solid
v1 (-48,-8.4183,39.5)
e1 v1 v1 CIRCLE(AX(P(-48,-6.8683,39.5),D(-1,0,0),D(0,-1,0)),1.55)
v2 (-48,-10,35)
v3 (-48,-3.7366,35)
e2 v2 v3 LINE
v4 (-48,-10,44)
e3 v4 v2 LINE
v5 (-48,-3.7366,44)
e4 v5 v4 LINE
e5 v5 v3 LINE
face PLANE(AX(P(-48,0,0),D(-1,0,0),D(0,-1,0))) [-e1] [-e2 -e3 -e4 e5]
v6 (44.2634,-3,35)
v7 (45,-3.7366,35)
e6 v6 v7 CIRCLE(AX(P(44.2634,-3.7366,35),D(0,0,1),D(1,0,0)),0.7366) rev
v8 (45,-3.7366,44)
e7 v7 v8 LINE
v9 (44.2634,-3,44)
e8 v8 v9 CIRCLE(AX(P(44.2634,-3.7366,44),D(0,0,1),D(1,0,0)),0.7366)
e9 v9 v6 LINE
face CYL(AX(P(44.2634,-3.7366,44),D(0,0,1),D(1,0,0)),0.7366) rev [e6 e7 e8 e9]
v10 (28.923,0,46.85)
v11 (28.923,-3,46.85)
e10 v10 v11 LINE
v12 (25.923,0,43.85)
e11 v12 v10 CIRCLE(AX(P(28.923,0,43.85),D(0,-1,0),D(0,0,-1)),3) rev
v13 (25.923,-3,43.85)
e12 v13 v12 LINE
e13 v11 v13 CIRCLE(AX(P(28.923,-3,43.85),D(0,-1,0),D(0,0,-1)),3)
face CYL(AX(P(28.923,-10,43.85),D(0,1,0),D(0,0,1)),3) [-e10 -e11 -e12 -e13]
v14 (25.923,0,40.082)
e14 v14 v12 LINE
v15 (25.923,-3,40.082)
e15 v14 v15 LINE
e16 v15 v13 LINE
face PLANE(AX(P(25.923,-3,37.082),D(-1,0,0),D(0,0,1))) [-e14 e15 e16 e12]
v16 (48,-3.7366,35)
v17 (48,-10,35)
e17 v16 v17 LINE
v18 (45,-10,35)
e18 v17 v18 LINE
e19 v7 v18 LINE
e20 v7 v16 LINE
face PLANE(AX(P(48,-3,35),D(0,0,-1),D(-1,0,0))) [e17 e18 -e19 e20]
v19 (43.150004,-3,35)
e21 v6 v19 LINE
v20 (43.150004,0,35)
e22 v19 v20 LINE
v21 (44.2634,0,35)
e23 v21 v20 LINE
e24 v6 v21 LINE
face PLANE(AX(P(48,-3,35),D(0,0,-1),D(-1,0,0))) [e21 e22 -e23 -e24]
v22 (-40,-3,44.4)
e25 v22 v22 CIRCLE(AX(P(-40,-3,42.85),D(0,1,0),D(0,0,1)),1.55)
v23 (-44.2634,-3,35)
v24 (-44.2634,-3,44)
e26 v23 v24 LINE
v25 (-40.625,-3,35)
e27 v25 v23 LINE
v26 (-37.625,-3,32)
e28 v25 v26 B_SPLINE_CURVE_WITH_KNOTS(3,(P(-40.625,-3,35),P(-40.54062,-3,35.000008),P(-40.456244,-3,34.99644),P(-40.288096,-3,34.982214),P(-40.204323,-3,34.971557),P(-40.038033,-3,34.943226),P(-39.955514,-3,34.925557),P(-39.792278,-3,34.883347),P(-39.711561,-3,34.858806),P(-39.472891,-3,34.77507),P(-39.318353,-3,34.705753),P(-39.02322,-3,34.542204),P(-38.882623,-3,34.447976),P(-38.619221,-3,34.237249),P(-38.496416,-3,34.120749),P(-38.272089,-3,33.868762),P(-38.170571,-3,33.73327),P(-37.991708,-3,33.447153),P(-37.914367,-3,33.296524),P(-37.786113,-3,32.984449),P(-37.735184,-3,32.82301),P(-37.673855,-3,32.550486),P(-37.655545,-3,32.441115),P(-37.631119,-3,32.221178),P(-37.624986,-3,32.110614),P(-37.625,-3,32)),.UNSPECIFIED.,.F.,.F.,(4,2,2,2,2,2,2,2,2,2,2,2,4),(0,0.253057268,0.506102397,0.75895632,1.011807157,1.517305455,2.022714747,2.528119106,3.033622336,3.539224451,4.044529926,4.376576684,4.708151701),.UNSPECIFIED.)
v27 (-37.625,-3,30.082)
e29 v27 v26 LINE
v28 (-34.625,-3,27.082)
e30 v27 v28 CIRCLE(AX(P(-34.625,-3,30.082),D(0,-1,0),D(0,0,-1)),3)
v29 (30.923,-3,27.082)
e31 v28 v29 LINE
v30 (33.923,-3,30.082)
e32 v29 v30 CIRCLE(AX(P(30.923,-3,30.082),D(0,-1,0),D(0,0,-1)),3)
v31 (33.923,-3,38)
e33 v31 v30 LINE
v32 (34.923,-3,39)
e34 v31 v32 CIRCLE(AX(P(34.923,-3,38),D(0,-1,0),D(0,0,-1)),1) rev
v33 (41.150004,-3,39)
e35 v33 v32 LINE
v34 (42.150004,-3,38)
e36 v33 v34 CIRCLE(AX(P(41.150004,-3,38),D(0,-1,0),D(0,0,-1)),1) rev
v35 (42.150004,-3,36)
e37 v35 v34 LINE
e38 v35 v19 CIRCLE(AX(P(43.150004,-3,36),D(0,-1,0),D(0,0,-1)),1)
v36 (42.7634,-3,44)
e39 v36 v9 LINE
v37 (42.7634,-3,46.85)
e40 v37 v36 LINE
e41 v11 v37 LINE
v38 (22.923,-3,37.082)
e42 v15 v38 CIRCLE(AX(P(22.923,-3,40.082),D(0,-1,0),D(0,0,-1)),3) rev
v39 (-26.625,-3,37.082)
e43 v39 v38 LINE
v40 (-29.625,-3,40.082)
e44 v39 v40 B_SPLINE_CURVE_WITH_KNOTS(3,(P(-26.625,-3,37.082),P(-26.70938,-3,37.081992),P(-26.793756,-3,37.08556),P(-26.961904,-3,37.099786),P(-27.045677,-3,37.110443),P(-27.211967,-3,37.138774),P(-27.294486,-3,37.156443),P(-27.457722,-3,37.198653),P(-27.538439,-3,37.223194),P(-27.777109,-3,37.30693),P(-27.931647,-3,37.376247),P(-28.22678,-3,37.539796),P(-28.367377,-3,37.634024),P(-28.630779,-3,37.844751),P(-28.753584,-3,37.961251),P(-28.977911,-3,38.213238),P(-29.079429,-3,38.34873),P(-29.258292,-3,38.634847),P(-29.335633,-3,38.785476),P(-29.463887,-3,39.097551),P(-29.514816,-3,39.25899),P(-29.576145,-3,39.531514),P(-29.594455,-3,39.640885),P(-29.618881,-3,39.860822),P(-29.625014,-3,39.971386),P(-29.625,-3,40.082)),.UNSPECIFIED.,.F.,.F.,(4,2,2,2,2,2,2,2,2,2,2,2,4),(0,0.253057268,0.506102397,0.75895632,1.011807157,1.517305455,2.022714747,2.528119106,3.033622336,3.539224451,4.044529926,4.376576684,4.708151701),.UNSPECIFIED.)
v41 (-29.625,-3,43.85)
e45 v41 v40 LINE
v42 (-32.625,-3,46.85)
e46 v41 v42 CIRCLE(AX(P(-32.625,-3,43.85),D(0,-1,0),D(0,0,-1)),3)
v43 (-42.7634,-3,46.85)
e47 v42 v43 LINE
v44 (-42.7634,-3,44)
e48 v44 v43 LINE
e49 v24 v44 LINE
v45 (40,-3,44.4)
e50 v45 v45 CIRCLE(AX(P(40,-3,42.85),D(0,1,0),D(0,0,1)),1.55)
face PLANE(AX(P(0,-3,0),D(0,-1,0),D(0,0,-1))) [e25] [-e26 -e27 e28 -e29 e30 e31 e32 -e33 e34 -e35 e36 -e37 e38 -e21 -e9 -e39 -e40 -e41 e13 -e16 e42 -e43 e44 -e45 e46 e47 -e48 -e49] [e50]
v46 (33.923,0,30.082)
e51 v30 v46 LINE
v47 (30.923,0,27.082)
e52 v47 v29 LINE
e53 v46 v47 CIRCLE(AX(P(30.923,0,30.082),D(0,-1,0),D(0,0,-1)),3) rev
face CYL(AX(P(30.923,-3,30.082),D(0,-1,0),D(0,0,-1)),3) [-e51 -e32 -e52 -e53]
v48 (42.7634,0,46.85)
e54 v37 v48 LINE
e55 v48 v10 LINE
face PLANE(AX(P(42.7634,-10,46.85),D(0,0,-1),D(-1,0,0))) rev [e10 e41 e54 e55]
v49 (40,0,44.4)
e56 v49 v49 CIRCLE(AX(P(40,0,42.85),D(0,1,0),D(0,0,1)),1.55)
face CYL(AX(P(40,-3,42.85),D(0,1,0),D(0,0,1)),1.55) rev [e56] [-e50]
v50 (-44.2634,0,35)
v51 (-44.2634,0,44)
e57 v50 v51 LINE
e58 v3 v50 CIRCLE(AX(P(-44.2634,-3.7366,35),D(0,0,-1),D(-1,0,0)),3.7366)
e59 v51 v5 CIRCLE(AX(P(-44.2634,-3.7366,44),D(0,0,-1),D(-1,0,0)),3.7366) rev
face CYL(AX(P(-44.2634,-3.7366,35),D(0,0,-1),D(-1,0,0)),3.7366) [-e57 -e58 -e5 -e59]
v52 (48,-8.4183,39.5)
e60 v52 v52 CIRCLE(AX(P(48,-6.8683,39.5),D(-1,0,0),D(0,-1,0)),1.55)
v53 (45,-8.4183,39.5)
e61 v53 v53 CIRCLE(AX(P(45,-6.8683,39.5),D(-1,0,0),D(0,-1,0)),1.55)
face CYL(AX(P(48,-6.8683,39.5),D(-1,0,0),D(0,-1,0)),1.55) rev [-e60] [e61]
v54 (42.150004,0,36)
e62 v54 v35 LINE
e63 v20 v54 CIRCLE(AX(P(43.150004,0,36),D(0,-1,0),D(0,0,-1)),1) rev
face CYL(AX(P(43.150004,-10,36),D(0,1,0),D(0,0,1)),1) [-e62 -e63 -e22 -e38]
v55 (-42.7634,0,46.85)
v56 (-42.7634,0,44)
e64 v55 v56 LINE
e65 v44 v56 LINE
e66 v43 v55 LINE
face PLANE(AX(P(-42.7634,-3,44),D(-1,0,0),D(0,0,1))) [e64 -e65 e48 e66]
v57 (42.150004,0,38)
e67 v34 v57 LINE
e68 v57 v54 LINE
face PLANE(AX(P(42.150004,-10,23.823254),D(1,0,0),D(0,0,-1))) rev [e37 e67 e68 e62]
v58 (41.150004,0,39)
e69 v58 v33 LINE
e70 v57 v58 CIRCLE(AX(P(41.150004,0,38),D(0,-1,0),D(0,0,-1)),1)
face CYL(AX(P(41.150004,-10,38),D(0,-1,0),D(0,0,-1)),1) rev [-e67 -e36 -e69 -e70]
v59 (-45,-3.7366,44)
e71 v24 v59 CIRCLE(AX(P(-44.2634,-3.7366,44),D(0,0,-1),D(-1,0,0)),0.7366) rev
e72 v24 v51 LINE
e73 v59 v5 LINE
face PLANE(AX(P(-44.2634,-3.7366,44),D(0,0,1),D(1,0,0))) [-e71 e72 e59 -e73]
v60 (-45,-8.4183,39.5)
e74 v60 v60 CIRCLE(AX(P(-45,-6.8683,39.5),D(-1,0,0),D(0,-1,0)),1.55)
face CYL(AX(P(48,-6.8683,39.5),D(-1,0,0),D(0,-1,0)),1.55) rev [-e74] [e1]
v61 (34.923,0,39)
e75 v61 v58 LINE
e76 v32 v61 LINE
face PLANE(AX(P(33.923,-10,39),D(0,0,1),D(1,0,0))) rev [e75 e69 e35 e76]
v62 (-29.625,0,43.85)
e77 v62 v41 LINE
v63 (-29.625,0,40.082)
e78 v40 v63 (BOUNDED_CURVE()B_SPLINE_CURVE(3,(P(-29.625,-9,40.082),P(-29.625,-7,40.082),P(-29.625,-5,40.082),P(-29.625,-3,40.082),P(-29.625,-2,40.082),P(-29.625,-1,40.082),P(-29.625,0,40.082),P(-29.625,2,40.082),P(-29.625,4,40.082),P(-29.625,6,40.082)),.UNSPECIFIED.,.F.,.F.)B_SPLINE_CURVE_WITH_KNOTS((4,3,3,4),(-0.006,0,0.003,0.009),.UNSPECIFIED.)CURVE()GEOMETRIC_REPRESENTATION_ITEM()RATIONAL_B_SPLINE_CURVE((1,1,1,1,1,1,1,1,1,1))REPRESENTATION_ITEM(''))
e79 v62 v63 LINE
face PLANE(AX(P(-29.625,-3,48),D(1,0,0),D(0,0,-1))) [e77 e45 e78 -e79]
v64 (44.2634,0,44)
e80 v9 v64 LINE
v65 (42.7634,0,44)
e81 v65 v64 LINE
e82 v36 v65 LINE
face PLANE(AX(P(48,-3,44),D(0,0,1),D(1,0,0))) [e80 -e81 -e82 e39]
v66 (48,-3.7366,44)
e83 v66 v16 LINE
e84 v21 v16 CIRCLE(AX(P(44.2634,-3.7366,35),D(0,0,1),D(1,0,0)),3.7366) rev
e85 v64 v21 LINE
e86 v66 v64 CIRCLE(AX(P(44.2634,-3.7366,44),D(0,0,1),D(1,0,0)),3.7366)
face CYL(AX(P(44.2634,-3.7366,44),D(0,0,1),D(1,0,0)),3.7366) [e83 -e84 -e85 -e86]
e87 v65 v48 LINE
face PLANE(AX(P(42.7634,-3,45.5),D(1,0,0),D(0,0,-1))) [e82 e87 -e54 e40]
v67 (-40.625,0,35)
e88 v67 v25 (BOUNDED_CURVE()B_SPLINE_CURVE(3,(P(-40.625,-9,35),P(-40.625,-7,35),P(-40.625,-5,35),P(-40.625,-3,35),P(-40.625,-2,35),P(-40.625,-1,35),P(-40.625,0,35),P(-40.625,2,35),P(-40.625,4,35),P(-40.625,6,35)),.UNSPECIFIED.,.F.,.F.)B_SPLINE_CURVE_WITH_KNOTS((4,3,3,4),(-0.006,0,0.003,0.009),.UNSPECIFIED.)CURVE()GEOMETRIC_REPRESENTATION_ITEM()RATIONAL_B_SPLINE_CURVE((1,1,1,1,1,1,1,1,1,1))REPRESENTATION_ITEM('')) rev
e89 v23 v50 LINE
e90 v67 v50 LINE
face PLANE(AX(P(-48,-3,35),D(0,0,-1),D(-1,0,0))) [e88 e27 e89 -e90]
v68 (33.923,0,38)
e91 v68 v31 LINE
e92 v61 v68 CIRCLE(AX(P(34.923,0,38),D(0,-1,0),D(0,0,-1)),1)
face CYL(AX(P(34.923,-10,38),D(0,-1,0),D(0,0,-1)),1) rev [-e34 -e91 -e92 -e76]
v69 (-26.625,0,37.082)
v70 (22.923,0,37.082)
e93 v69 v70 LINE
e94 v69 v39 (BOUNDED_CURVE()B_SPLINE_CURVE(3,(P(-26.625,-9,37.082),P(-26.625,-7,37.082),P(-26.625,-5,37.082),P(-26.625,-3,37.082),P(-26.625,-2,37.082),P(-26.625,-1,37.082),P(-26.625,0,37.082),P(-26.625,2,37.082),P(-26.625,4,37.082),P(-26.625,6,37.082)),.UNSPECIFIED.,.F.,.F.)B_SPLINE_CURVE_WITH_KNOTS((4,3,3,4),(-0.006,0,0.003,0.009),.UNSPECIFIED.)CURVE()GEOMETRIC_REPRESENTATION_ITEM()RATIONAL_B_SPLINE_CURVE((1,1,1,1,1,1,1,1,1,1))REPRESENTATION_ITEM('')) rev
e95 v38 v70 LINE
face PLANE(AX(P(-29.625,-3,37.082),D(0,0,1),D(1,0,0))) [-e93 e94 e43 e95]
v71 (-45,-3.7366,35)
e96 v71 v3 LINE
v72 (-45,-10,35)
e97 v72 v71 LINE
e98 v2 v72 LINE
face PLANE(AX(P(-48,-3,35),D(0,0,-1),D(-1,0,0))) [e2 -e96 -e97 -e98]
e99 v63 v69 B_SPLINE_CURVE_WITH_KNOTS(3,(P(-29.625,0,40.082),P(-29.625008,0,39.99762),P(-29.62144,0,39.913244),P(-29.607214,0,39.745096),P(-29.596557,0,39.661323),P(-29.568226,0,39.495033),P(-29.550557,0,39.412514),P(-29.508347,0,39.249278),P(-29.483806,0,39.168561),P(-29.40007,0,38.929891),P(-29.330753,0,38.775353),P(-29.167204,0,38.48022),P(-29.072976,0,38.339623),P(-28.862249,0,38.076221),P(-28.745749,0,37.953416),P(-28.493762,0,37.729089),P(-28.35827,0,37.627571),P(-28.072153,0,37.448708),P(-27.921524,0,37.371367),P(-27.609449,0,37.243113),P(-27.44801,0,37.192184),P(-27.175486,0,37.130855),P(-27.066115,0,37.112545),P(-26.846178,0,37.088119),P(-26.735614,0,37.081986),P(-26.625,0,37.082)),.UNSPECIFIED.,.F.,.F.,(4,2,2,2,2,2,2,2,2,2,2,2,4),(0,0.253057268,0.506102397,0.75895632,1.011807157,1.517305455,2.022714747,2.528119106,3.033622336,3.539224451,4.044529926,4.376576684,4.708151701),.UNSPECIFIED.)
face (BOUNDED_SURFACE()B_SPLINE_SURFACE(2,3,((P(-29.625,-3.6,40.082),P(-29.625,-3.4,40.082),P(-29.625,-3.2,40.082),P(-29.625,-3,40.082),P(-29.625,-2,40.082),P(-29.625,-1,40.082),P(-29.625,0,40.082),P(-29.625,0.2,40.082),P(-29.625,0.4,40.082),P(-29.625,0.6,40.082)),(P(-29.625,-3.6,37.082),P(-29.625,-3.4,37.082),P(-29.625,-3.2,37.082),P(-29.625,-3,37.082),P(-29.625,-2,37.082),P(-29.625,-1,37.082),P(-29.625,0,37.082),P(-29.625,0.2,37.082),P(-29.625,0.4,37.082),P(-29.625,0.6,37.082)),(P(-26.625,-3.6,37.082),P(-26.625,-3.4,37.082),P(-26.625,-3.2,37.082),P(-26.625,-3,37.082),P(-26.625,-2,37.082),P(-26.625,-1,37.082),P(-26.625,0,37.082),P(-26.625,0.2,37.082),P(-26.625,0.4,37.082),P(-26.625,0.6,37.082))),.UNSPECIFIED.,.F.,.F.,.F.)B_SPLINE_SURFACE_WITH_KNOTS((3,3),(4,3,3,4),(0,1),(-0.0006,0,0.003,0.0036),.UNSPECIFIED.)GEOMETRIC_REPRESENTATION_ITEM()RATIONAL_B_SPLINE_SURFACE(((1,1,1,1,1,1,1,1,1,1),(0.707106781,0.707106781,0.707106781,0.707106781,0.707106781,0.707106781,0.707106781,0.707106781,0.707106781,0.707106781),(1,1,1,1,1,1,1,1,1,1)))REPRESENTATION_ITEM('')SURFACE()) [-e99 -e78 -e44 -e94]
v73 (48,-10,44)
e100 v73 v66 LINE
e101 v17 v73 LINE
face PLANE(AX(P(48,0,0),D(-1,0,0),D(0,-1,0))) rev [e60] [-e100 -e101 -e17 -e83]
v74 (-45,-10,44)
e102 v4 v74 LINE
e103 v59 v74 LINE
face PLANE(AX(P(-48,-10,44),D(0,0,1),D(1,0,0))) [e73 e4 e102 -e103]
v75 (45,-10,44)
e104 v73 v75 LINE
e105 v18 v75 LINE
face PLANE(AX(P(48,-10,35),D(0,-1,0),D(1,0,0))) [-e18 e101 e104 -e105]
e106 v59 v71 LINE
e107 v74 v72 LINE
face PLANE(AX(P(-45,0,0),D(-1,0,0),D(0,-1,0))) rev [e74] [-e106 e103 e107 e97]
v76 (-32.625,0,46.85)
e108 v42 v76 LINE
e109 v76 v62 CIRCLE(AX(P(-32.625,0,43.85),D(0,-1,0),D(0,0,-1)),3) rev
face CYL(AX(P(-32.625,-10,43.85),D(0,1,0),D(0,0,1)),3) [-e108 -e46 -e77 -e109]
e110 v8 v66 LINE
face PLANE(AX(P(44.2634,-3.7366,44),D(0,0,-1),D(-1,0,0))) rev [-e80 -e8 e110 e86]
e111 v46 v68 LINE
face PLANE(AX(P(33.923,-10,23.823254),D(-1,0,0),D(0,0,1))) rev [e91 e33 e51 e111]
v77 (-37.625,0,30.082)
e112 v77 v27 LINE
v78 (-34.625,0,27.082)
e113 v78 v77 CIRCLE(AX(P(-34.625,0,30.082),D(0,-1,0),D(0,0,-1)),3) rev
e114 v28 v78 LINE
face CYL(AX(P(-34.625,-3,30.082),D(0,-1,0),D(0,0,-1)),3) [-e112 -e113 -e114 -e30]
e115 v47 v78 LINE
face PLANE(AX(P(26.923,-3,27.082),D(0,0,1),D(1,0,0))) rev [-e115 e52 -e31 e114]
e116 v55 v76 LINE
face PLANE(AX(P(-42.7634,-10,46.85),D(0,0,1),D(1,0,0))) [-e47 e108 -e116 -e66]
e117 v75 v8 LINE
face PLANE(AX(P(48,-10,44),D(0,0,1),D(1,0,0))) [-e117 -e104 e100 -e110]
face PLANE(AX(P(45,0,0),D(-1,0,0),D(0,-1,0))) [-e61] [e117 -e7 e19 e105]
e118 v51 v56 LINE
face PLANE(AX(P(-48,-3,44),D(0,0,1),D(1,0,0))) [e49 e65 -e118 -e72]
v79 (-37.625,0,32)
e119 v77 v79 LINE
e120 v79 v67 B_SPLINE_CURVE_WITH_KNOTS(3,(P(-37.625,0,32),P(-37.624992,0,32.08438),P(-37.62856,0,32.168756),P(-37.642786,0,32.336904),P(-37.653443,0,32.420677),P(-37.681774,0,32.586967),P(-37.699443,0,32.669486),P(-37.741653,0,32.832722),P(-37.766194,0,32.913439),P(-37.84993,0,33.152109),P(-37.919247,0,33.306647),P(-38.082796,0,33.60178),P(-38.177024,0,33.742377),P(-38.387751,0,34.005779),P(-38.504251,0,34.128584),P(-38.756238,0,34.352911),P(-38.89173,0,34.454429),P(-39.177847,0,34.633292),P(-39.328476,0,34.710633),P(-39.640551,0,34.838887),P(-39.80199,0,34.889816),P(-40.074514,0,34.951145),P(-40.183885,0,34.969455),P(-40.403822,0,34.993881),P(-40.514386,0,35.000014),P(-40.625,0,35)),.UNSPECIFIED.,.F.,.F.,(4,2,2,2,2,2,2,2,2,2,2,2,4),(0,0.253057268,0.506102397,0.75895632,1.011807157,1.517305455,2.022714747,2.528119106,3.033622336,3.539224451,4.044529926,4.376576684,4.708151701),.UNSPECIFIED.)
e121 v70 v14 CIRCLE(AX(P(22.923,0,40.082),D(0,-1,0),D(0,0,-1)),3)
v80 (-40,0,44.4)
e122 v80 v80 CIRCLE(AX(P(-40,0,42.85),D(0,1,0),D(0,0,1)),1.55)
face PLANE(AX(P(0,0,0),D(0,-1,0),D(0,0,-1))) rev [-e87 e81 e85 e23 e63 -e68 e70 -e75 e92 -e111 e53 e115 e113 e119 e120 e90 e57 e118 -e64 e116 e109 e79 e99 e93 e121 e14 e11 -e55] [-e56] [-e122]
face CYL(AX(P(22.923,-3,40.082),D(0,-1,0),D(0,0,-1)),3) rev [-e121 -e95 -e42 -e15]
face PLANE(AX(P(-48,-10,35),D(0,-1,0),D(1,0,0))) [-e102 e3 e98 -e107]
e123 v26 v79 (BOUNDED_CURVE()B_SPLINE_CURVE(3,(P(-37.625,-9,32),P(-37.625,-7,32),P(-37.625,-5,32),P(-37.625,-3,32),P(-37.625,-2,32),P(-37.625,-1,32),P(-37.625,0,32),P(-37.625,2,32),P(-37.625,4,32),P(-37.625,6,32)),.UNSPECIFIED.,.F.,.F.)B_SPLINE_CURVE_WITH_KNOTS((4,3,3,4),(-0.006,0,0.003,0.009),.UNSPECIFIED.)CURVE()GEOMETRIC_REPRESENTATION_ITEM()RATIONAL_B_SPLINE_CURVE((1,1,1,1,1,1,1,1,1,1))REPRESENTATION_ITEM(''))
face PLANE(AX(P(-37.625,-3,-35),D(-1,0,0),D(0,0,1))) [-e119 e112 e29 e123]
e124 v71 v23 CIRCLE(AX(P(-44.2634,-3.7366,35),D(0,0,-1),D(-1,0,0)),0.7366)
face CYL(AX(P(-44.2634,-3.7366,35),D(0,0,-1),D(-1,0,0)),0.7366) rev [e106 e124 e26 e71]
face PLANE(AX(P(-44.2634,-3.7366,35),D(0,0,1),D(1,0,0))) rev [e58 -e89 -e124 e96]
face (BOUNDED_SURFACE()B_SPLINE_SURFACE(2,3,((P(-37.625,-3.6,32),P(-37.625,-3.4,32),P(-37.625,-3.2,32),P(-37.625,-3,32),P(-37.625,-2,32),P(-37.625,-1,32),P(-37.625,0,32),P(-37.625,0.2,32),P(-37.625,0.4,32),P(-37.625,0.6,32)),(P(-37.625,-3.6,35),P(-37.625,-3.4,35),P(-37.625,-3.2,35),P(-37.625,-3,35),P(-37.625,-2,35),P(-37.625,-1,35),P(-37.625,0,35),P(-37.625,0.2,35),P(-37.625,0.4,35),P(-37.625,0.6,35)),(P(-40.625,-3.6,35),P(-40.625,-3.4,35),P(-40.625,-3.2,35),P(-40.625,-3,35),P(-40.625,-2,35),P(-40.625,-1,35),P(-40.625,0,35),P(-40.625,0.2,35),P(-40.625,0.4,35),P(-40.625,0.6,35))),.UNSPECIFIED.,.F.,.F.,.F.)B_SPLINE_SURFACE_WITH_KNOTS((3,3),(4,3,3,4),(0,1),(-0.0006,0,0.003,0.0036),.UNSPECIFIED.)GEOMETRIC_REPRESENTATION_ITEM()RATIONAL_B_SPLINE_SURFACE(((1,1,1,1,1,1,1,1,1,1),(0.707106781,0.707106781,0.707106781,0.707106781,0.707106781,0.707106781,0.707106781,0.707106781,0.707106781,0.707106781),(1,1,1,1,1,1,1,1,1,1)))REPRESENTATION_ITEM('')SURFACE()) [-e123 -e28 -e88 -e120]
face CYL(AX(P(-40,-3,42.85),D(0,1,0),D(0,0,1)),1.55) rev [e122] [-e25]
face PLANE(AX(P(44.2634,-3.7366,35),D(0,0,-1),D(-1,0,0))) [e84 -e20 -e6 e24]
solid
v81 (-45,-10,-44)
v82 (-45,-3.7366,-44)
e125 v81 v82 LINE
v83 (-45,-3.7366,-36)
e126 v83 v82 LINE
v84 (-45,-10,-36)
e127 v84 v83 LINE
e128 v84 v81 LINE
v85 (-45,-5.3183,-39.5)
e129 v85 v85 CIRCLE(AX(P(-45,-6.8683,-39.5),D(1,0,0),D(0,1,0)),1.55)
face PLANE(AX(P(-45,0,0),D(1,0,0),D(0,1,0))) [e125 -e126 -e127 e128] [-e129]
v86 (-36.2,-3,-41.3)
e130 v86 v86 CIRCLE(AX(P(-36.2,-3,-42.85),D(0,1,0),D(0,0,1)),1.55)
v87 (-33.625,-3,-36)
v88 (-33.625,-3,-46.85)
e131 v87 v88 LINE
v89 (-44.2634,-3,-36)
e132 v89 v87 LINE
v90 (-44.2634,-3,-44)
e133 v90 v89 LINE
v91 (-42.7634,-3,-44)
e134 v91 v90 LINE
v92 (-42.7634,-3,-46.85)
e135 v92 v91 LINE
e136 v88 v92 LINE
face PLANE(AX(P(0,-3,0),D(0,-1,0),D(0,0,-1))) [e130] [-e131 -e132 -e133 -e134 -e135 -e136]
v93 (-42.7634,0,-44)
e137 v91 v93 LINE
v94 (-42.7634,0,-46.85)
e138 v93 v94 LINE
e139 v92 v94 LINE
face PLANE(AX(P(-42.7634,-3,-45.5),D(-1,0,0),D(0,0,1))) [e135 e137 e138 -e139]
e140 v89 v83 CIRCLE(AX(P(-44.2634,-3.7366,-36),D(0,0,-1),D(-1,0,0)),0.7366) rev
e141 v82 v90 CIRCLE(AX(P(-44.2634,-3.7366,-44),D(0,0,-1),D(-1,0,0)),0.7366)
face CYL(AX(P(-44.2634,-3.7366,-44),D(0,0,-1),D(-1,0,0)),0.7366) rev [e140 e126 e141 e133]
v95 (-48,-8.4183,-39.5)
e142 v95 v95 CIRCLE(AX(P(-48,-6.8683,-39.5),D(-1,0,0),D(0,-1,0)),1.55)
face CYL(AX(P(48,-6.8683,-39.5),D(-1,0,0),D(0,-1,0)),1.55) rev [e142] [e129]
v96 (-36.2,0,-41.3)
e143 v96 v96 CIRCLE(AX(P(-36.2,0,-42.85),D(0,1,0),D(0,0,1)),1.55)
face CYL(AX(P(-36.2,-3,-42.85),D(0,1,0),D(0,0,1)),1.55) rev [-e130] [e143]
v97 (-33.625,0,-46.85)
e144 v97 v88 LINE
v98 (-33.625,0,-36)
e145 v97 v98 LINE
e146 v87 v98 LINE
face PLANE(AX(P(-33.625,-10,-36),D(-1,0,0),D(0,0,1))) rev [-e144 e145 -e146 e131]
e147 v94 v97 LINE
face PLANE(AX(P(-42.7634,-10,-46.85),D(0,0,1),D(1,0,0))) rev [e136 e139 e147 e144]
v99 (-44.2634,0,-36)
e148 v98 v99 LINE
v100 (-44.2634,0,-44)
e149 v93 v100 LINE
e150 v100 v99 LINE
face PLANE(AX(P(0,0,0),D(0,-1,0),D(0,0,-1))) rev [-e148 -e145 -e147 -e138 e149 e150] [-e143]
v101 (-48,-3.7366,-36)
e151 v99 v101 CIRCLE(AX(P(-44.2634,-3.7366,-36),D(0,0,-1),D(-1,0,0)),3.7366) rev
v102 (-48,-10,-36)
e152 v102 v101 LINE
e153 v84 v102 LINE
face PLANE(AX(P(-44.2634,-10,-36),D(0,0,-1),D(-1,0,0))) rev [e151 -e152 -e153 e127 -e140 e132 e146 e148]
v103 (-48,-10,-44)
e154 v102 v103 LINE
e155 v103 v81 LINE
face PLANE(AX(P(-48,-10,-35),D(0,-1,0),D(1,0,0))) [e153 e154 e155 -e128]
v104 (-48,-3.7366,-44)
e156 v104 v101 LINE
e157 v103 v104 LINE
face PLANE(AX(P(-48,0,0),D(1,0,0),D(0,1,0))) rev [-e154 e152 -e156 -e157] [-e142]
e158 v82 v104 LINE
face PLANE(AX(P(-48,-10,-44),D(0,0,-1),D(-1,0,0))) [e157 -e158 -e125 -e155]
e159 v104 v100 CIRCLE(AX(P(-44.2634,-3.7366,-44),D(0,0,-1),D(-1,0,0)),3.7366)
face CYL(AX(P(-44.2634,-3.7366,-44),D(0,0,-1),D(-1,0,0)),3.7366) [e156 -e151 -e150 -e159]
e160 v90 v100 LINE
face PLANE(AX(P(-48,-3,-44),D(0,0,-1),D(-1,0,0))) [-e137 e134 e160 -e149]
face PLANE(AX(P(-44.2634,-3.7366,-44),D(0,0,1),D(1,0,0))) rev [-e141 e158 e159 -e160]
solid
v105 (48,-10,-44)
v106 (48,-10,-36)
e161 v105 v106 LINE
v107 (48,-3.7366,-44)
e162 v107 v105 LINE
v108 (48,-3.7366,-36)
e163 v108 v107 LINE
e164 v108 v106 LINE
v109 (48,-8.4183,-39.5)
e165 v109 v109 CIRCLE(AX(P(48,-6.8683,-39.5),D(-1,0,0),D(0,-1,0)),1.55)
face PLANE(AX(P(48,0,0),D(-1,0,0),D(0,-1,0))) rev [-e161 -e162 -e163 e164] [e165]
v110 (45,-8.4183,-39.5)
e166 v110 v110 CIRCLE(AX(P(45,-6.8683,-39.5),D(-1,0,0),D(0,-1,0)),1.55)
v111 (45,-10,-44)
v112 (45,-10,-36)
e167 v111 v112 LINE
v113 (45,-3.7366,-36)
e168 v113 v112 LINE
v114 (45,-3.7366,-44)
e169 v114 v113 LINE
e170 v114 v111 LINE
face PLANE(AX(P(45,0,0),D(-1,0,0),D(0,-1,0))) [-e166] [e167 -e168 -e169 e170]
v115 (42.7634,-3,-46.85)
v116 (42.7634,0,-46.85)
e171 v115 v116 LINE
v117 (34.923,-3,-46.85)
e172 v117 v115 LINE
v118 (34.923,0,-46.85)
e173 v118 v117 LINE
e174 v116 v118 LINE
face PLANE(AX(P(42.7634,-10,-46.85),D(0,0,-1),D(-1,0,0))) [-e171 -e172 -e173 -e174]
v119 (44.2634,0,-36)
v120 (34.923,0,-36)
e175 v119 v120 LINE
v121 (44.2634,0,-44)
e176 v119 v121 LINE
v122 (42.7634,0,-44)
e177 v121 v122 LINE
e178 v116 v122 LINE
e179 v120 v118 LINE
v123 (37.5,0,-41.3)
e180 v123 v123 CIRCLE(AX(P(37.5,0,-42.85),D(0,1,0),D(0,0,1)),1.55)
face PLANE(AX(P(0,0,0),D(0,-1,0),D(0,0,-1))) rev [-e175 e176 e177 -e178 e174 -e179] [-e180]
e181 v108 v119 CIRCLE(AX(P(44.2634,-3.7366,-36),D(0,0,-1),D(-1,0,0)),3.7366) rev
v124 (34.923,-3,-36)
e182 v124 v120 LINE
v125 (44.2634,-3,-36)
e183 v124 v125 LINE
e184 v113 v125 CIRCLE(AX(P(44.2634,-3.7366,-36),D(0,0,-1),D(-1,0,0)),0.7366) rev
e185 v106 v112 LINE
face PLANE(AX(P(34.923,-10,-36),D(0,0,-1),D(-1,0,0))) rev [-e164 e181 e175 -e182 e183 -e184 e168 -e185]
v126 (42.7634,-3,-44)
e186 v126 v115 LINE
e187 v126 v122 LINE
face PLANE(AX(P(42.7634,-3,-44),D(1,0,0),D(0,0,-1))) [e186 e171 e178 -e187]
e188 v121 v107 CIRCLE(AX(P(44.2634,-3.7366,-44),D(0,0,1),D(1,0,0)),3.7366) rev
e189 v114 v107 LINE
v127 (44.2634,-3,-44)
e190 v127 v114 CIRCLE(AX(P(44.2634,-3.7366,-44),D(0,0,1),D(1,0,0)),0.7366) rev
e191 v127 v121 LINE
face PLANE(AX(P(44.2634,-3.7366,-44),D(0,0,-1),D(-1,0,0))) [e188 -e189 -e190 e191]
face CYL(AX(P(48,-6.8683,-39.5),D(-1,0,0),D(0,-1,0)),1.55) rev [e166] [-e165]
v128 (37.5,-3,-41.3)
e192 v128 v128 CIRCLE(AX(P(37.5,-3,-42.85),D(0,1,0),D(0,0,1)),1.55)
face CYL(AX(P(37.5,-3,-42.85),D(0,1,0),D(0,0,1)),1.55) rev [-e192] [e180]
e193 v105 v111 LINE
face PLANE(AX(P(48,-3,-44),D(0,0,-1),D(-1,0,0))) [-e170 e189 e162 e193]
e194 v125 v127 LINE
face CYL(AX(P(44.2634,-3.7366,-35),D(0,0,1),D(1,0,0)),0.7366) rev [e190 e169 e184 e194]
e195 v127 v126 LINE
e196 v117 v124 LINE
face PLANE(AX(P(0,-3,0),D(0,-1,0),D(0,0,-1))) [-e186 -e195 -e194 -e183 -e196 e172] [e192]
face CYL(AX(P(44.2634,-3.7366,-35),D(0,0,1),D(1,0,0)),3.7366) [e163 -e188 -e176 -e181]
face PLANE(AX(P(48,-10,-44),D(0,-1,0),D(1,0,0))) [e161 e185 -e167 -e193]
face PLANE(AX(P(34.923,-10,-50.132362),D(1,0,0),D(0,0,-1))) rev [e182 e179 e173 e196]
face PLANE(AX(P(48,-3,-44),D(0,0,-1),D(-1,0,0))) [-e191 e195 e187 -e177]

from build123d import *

# Parameters (mm, degrees)
SKETCH2_R                = 1.55
SKETCH2_W                = 53.846
SKETCH2_H                = 54.164
BASE_FLANGE1_DEPTH       = 3
VARFILLET1_START         = -3
VARFILLET1_DEPTH         = 3
VARFILLET2_START         = -3
VARFILLET2_DEPTH         = 3
EDGE_FLANGE1_START       = -44
EDGE_FLANGE1_DEPTH       = 88
EDGE_FLANGE1_START_2     = -45.5
EDGE_FLANGE1_2_OUTLINE_W = 1.2366
EDGE_FLANGE1_2_OUTLINE_H = 3
EDGE_FLANGE1_2_DEPTH     = 1.5
EDGE_FLANGE1_START_3     = 44
EDGE_FLANGE1_3_OUTLINE_W = 1.2366
EDGE_FLANGE1_3_OUTLINE_H = 3
EDGE_FLANGE1_3_DEPTH     = 1.5
EDGE_FLANGE1_4_DEPTH     = 9
EDGE_FLANGE1_START_4     = 35
EDGE_FLANGE1_5_DEPTH     = 9
CUT_EXTRUDE1_DEPTH       = 69.614867264
SKETCH20_R               = 1.55
CUT_EXTRUDE2_DEPTH       = 108.288967324
CUT_EXTRUDE3_DEPTH       = 68.815356
CUT_EXTRUDE3_DEPTH_BACK  = 68.815356
FILLET1_R                = 3
CUT_EXTRUDE4_DEPTH       = 68.815356
SKETCH29_W               = 8.227003602
SKETCH29_H               = 15.176745615
CUT_EXTRUDE5_DEPTH       = 68.815356
FILLET2_R                = 1
FILLET3_R                = 3


with BuildPart() as part:
    # Base-Flange1: sheet metal written as solids
    # Sketch2 → Base-Flange1 (new body)
    with BuildSketch(Plane(origin=(0, 0, 0), x_dir=(1, 0, 0), z_dir=(0, 1, 0))):
        Polygon((-29.625, 48), (-29.625, 37.082), (30.923, 37.082), (30.923, 48), (44, 48), (44, 44), (48, 44), (48, 35), (36.923, 35), (36.923, -35), (48, -35), (48, -44), (44, -44), (44, -48), (30.923, -48), (25.923, -48), (25.923, -37.082), (-29.625, -37.082), (-29.625, -48), (-44, -48), (-44, -44), (-48, -44), (-48, -35), (-37.625, -35), (-37.625, 35), (-48, 35), (-48, 44), (-44, 44), (-44, 48), align=None)
        with Locations(Location((-36.2, 42.85, 0), (0, 0, 270))):
            Circle(SKETCH2_R, mode=Mode.SUBTRACT)
        with Locations(Location((-40, -42.85, 0), (0, 0, 270))):
            Circle(SKETCH2_R, mode=Mode.SUBTRACT)
        with Locations(Location((40, -42.85, 0), (0, 0, 270))):
            Circle(SKETCH2_R, mode=Mode.SUBTRACT)
        with Locations(Location((37.5, 42.85, 0), (0, 0, 270))):
            Circle(SKETCH2_R, mode=Mode.SUBTRACT)
        Rectangle(SKETCH2_W, SKETCH2_H, mode=Mode.SUBTRACT)
    extrude(amount=-BASE_FLANGE1_DEPTH)

    # VarFillet1: read off the stored shape, not the designer's step
    # VarFillet1 outline → VarFillet1 (add)
    with BuildSketch(Plane(origin=(0, 0, 0), x_dir=(1, 0, 0), z_dir=(0, 1, 0)).offset(VARFILLET1_START)):
        with BuildLine():
            Line((30.923, 37.082), (30.923, 40.082))
            add(Edge.make_bspline(
                [(30.923, 40.082), (30.923, 37.082), (27.923, 37.082)],
                knots=[0, 0, 0, 1, 1, 1], degree=2, weights=[1, 0.707106781, 1]))
            Line((27.923, 37.082), (30.923, 37.082))
        make_face()
        with BuildLine():
            Line((36.923, 35), (36.923, 32))
            add(Edge.make_bspline(
                [(36.923, 32), (36.923, 35), (39.923, 35)],
                knots=[0, 0, 0, 1, 1, 1], degree=2, weights=[1, 0.707106781, 1]))
            Line((39.923, 35), (36.923, 35))
        make_face()
        with BuildLine():
            add(Edge.make_bspline(
                [(39.923, -35), (36.923, -35), (36.923, -32)],
                knots=[0, 0, 0, 1, 1, 1], degree=2, weights=[1, 0.707106781, 1]))
            Line((36.923, -32), (36.923, -35))
            Line((36.923, -35), (39.923, -35))
        make_face()
        with BuildLine():
            Line((-29.625, -37.082), (-29.625, -40.082))
            add(Edge.make_bspline(
                [(-29.625, -40.082), (-29.625, -37.082), (-26.625, -37.082)],
                knots=[0, 0, 0, 1, 1, 1], degree=2, weights=[1, 0.707106781, 1]))
            Line((-26.625, -37.082), (-29.625, -37.082))
        make_face()
    extrude(amount=VARFILLET1_DEPTH)

    # VarFillet2: read off the stored shape, not the designer's step
    # VarFillet2 outline → VarFillet2 (add)
    with BuildSketch(Plane(origin=(0, 0, 0), x_dir=(1, 0, 0), z_dir=(0, 1, 0)).offset(VARFILLET2_START)):
        with BuildLine():
            Line((26.923, -27.082), (26.923, -24.082))
            add(Edge.make_bspline(
                [(26.923, -24.082), (26.923, -27.082), (23.923, -27.082)],
                knots=[0, 0, 0, 1, 1, 1], degree=2, weights=[1, 0.707106781, 1]))
            Line((23.923, -27.082), (26.923, -27.082))
        make_face()
        with BuildLine():
            add(Edge.make_bspline(
                [(23.923, 27.082), (26.923, 27.082), (26.923, 24.082)],
                knots=[0, 0, 0, 1, 1, 1], degree=2, weights=[1, 0.707106781, 1]))
            Line((26.923, 24.082), (26.923, 27.082))
            Line((26.923, 27.082), (23.923, 27.082))
        make_face()
        with BuildLine():
            Line((-26.923, -27.082), (-23.923, -27.082))
            add(Edge.make_bspline(
                [(-23.923, -27.082), (-26.923, -27.082), (-26.923, -24.082)],
                knots=[0, 0, 0, 1, 1, 1], degree=2, weights=[1, 0.707106781, 1]))
            Line((-26.923, -24.082), (-26.923, -27.082))
        make_face()
        with BuildLine():
            add(Edge.make_bspline(
                [(-26.923, 24.082), (-26.923, 27.082), (-23.923, 27.082)],
                knots=[0, 0, 0, 1, 1, 1], degree=2, weights=[1, 0.707106781, 1]))
            Line((-23.923, 27.082), (-26.923, 27.082))
            Line((-26.923, 27.082), (-26.923, 24.082))
        make_face()
        with BuildLine():
            Line((-37.625, -35), (-37.625, -32))
            add(Edge.make_bspline(
                [(-37.625, -32), (-37.625, -35), (-40.625, -35)],
                knots=[0, 0, 0, 1, 1, 1], degree=2, weights=[1, 0.707106781, 1]))
            Line((-40.625, -35), (-37.625, -35))
        make_face()
        with BuildLine():
            add(Edge.make_bspline(
                [(-40.625, 35), (-37.625, 35), (-37.625, 32)],
                knots=[0, 0, 0, 1, 1, 1], degree=2, weights=[1, 0.707106781, 1]))
            Line((-37.625, 32), (-37.625, 35))
            Line((-37.625, 35), (-40.625, 35))
        make_face()
        with BuildLine():
            Line((-29.625, 37.082), (-26.625, 37.082))
            add(Edge.make_bspline(
                [(-26.625, 37.082), (-29.625, 37.082), (-29.625, 40.082)],
                knots=[0, 0, 0, 1, 1, 1], degree=2, weights=[1, 0.707106781, 1]))
            Line((-29.625, 40.082), (-29.625, 37.082))
        make_face()
    extrude(amount=VARFILLET2_DEPTH)

    # Edge-Flange1: read off the stored shape, not the designer's step
    # Edge-Flange1 outline → Edge-Flange1 (cut)
    with BuildSketch(Plane.XY.offset(EDGE_FLANGE1_START)):
        with BuildLine():
            ThreePointArc((-47.926677222, -3), (-46.630867001, -0.845704021), (-44.2634, 0))
            Line((-44.2634, 0), (-48, 0))
            Line((-48, 0), (-48, -3))
            Line((-48, -3), (-47.926677222, -3))
        make_face()
        with BuildLine():
            Line((48, 0), (44.2634, 0))
            ThreePointArc((44.2634, 0), (46.630867001, -0.845704021), (47.926677222, -3))
            Line((47.926677222, -3), (48, -3))
            Line((48, -3), (48, 0))
        make_face()
    extrude(amount=EDGE_FLANGE1_DEPTH, mode=Mode.SUBTRACT)

    # Edge-Flange1 2 outline → Edge-Flange1 2 (cut)
    with BuildSketch(Plane.XY.offset(EDGE_FLANGE1_START_2)):
        with Locations((-43.3817, -1.5)):
            Rectangle(EDGE_FLANGE1_2_OUTLINE_W, EDGE_FLANGE1_2_OUTLINE_H)
        with Locations((43.3817, -1.5)):
            Rectangle(EDGE_FLANGE1_2_OUTLINE_W, EDGE_FLANGE1_2_OUTLINE_H)
    extrude(amount=EDGE_FLANGE1_2_DEPTH, mode=Mode.SUBTRACT)

    # Edge-Flange1 3 outline → Edge-Flange1 3 (cut)
    with BuildSketch(Plane.XY.offset(EDGE_FLANGE1_START_3)):
        with Locations((-43.3817, -1.5)):
            Rectangle(EDGE_FLANGE1_3_OUTLINE_W, EDGE_FLANGE1_3_OUTLINE_H)
        with Locations((43.3817, -1.5)):
            Rectangle(EDGE_FLANGE1_3_OUTLINE_W, EDGE_FLANGE1_3_OUTLINE_H)
    extrude(amount=EDGE_FLANGE1_3_DEPTH, mode=Mode.SUBTRACT)

    # Edge-Flange1 4 outline → Edge-Flange1 4 (add)
    with BuildSketch(Plane.XY.offset(EDGE_FLANGE1_START)):
        with BuildLine():
            ThreePointArc((-45, -3.7366), (-44.784254855, -3.215745145), (-44.2634, -3))
            Line((-44.2634, -3), (-47.926677222, -3))
            ThreePointArc((-47.926677222, -3), (-47.981624121, -3.36647982), (-48, -3.7366))
            Line((-48, -3.7366), (-48, -10))
            Line((-48, -10), (-45, -10))
            Line((-45, -10), (-45, -3.7366))
        make_face()
        with BuildLine():
            Line((47.926677222, -3), (44.2634, -3))
            ThreePointArc((44.2634, -3), (44.784254855, -3.215745145), (45, -3.7366))
            Line((45, -3.7366), (45, -10))
            Line((45, -10), (48, -10))
            Line((48, -10), (48, -3.7366))
            ThreePointArc((48, -3.7366), (47.981624121, -3.36647982), (47.926677222, -3))
        make_face()
    extrude(amount=EDGE_FLANGE1_4_DEPTH)

    # Edge-Flange1 5 outline → Edge-Flange1 5 (add)
    with BuildSketch(Plane.XY.offset(EDGE_FLANGE1_START_4)):
        with BuildLine():
            ThreePointArc((-45, -3.7366), (-44.784254855, -3.215745145), (-44.2634, -3))
            Line((-44.2634, -3), (-47.926677222, -3))
            ThreePointArc((-47.926677222, -3), (-47.981624121, -3.36647982), (-48, -3.7366))
            Line((-48, -3.7366), (-48, -10))
            Line((-48, -10), (-45, -10))
            Line((-45, -10), (-45, -3.7366))
        make_face()
        with BuildLine():
            Line((47.926677222, -3), (44.2634, -3))
            ThreePointArc((44.2634, -3), (44.784254855, -3.215745145), (45, -3.7366))
            Line((45, -3.7366), (45, -10))
            Line((45, -10), (48, -10))
            Line((48, -10), (48, -3.7366))
            ThreePointArc((48, -3.7366), (47.981624121, -3.36647982), (47.926677222, -3))
        make_face()
    extrude(amount=EDGE_FLANGE1_5_DEPTH)

    # Sketch19 → Cut-Extrude1 (cut, through all)
    with BuildSketch(Plane(origin=(0, 0, 0), x_dir=(1, 0, 0), z_dir=(0, 1, 0))):
        Polygon((-42.7634, 45.5), (-42.7634, 46.85), (-29.625, 46.85), (-29.625, 48), (-44, 48), (-44, 45.5), align=None)
        Polygon((44, 45.5), (42.7634, 45.5), (42.7634, 46.85), (29.625, 46.85), (29.625, 48), (44, 48), align=None)
        Polygon((42.7634, -45.5), (42.7634, -46.85), (24.798845721, -46.85), (24.798845721, -48), (44, -48), (44, -45.5), align=None)
        Polygon((-44, -45.5), (-42.7634, -45.5), (-42.7634, -46.85), (-29.625, -46.85), (-29.625, -48), (-44, -48), align=None)
    extrude(amount=-CUT_EXTRUDE1_DEPTH, mode=Mode.SUBTRACT)

    # Sketch20 → Cut-Extrude2 (cut, through all)
    with BuildSketch(Plane.ZY.offset(48)):
        with Locations(Location((-39.5, -6.8683, 0), (0, 0, 270))):
            Circle(SKETCH20_R)
        with Locations(Location((39.5, -6.8683, 0), (0, 0, 270))):
            Circle(SKETCH20_R)
    extrude(amount=-CUT_EXTRUDE2_DEPTH, mode=Mode.SUBTRACT)

    # Sketch21 → Cut-Extrude3 (cut, two sides: drawn at the far end of the back side and taken through both)
    with BuildSketch(Plane(origin=(0, 0, 0), x_dir=(1, 0, 0), z_dir=(0, 1, 0)).offset(-CUT_EXTRUDE3_DEPTH_BACK)):
        Polygon((36.923, -27.082), (-37.625, -27.082), (-71.217622097, -27.082), (-71.217622097, 35), (-32.625, 35), (-32.625, 50), (33.923, 50), (33.923, 35), (65.560700491, 35), (65.560700491, -21.509199751), align=None)
    extrude(amount=CUT_EXTRUDE3_DEPTH + CUT_EXTRUDE3_DEPTH_BACK, mode=Mode.SUBTRACT)


with BuildPart() as cut_extrude3_piece_1:
    # of the separate pieces the step leaves, piece 1, a body of its own (cut_extrude3_pieces)
    add(part.part.solids().sort_by_distance((-37.625, 0, 32))[0])

    # Fillet1
    fillet1_edges = [cut_extrude3_piece_1.edges().sort_by_distance(p)[0] for p in [
        (36.923, -1.5, 27.082),
        (-37.625, -1.5, 27.082),
        (-29.625, -1.5, 46.85),
    ]]
    fillet(fillet1_edges, radius=FILLET1_R)

    # Sketch29 → Cut-Extrude5 (cut, through all)
    with BuildSketch(Plane(origin=(0, 0, 0), x_dir=(1, 0, 0), z_dir=(0, 1, 0))):
        with Locations((38.036501801, -31.411627192)):
            Rectangle(SKETCH29_W, SKETCH29_H)
    extrude(amount=-CUT_EXTRUDE5_DEPTH, mode=Mode.SUBTRACT)

    # Fillet2
    fillet2_edges = [cut_extrude3_piece_1.edges().sort_by_distance(p)[0] for p in [
        (42.150003602, -1.5, 35),
        (33.923, -1.5, 39),
        (42.150003602, -1.5, 39),
    ]]
    fillet(fillet2_edges, radius=FILLET2_R)

    # Fillet3
    fillet3_edges = [cut_extrude3_piece_1.edges().sort_by_distance(p)[0] for p in [
        (25.923, -1.5, 46.85),
        (33.923, -1.5, 27.082),
        (25.923, -1.5, 37.082),
    ]]
    fillet(fillet3_edges, radius=FILLET3_R)


with BuildPart() as cut_extrude3_piece_2:
    # of the separate pieces the step leaves, piece 2, a body of its own (cut_extrude3_pieces)
    add(part.part.solids().sort_by_distance((-42.7634, 0, -44))[0])


with BuildPart() as cut_extrude3_piece_3:
    # of the separate pieces the step leaves, piece 3, a body of its own (cut_extrude3_pieces)
    add(part.part.solids().sort_by_distance((33.923, 0, -46.85))[0])


with BuildPart() as cut_extrude4_tool:
    # Sketch28 → Cut-Extrude4 (new, through all)
    with BuildSketch(Plane(origin=(0, 0, 0), x_dir=(1, 0, 0), z_dir=(0, 1, 0))):
        Polygon((-44.2634, 36), (-33.625, 36), (-33.625, 46.85), (-33.625, 50.132362052), (34.923, 50.132362052), (34.923, 46.85), (34.923, 36), (44.2634, 36), (57.549667037, 36), (57.549667037, 25.658972996), (-51.756960045, 25.658972996), (-51.756960045, 36), align=None)
    extrude(amount=-CUT_EXTRUDE4_DEPTH)


with BuildPart() as cut_extrude3_piece_2_1:
    add(cut_extrude3_piece_2.part)

    # Cut-Extrude4: cut by cut_extrude4_tool
    add(cut_extrude4_tool.part, mode=Mode.SUBTRACT)


with BuildPart() as cut_extrude3_piece_3_1:
    add(cut_extrude3_piece_3.part)

    # Cut-Extrude4: cut by cut_extrude4_tool
    add(cut_extrude4_tool.part, mode=Mode.SUBTRACT)


solid = Compound([cut_extrude3_piece_1.part, cut_extrude3_piece_2_1.part, cut_extrude3_piece_3_1.part])
